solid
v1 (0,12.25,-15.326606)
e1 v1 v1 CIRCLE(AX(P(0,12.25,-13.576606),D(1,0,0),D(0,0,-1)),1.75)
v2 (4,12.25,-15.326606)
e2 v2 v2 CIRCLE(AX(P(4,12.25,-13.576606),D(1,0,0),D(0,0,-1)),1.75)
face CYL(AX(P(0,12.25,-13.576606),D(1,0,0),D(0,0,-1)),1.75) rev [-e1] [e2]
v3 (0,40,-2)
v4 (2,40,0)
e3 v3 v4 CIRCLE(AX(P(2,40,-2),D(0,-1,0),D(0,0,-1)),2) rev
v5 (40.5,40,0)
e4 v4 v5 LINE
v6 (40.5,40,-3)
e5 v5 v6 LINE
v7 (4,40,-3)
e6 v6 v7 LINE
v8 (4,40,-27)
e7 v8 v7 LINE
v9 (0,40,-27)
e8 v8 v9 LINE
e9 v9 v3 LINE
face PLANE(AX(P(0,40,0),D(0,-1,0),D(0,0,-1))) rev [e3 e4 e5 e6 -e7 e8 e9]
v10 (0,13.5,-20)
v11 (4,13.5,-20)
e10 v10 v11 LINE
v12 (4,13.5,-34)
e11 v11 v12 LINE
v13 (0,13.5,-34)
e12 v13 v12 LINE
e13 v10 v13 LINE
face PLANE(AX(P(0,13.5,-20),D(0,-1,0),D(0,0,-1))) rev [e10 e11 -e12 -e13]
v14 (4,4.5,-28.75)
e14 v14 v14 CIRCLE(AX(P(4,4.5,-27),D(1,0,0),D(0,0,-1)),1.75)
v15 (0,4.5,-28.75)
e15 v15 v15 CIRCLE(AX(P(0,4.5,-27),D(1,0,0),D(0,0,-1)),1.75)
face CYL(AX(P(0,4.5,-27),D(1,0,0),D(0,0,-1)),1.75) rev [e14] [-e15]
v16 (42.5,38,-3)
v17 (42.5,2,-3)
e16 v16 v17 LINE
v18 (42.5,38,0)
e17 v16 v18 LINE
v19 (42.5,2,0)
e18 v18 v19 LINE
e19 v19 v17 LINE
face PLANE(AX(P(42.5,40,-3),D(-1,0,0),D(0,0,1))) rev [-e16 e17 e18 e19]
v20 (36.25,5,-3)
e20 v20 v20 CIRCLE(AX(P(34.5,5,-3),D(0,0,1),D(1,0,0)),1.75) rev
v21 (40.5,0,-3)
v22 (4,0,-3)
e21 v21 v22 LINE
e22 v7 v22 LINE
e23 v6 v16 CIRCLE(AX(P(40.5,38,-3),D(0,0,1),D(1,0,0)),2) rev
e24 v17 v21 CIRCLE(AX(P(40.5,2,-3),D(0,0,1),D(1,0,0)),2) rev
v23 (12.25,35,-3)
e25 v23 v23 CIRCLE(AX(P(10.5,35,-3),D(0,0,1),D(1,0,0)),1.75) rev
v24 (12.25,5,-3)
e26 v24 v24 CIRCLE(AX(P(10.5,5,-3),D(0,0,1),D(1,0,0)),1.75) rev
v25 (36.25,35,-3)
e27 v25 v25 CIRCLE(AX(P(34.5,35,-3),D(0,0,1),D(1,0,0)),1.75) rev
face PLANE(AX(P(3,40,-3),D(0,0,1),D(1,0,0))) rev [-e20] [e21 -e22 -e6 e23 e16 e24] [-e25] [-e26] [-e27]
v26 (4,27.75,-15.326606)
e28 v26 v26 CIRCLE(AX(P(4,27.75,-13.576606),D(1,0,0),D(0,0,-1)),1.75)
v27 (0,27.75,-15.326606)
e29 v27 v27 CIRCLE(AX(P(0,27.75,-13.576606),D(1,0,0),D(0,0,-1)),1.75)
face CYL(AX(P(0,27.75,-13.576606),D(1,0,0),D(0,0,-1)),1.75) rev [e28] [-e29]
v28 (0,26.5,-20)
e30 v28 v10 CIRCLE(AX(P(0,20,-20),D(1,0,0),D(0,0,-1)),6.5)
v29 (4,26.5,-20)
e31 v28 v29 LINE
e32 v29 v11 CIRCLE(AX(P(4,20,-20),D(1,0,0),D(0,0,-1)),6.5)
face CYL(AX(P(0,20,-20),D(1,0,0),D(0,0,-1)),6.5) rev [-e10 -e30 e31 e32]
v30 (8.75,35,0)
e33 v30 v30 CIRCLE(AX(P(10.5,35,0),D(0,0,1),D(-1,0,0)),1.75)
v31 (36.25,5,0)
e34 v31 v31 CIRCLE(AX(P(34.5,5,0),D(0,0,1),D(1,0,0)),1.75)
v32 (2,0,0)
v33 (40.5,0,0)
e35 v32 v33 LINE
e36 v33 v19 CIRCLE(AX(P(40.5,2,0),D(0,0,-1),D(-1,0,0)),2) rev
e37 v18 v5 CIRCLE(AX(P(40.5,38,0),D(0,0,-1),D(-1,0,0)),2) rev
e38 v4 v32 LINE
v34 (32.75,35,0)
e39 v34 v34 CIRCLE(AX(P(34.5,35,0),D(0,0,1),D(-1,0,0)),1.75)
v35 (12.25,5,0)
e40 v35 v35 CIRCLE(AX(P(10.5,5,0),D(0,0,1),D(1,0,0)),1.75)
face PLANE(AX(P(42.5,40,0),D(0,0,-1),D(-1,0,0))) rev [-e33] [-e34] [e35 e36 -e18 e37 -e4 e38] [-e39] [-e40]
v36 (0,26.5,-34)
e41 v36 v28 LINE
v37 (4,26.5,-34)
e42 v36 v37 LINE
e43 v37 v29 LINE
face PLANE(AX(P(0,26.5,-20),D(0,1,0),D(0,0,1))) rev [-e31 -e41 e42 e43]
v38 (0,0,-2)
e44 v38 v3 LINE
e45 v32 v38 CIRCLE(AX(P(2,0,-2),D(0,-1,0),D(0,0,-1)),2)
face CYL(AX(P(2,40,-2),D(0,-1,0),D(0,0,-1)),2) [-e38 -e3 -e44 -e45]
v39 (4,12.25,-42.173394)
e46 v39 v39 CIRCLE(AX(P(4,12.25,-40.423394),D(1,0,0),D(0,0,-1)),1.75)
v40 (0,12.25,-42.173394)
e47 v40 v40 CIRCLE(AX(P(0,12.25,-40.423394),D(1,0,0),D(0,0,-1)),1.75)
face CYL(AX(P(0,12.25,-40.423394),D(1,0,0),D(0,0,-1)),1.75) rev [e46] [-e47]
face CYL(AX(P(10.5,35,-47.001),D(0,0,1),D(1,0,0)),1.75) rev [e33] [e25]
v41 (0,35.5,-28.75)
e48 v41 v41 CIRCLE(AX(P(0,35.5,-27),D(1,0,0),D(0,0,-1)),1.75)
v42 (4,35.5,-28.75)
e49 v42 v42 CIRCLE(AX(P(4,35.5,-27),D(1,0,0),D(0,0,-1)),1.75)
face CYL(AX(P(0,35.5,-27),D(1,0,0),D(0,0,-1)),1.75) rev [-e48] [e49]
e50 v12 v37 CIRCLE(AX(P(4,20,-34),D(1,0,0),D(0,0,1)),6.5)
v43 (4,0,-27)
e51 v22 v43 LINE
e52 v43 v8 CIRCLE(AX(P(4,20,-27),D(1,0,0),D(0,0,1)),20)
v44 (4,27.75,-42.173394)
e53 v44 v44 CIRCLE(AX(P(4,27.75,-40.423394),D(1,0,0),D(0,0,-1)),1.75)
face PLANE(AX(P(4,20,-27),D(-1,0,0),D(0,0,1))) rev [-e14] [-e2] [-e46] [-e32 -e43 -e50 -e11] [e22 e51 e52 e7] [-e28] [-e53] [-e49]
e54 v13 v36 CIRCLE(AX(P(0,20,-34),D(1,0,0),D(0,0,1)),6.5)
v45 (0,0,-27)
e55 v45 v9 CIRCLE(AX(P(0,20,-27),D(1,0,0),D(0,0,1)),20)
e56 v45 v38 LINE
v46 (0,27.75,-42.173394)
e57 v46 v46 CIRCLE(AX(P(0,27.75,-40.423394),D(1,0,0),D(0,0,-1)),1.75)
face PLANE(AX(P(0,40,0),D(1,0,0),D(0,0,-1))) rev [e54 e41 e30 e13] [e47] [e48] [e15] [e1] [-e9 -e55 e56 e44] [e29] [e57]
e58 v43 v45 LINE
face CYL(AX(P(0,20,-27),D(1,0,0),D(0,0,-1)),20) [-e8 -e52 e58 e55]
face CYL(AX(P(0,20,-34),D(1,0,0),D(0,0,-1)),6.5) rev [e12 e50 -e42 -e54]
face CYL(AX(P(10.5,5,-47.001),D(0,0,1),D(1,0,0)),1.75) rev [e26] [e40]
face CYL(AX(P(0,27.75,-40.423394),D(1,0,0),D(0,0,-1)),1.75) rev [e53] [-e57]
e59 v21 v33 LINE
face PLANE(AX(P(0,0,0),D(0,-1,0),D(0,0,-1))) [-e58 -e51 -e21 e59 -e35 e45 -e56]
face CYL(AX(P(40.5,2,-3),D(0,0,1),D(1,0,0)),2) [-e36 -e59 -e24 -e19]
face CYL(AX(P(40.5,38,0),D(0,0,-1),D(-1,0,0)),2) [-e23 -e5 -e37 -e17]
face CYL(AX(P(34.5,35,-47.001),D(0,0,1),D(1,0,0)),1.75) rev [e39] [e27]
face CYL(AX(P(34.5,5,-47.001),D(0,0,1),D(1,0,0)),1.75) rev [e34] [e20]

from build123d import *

# Parameters (mm, degrees)
BOSS_EXTRUDE1_DEPTH      = 40
BOSS_EXTRUDE2_DEPTH      = 1
BOSS_EXTRUDE2_DEPTH_BACK = 3
CUT_EXTRUDE1_DEPTH       = 73.740978822
SKETCH5_R                = 1.75
CUT_EXTRUDE2_DEPTH       = 73.740978822
FILLET1_R                = 2
CUT_EXTRUDE3_REACH       = 76.935
SKETCH6_R                = 1.75


# Read off the part's stored shape, not the designer's step: moBlkMgr[Ga_GB37]
with BuildPart() as part:
    # Sketch1 → Boss-Extrude1 (new body)
    with BuildSketch(Plane(origin=(0, 0, 0), x_dir=(1, 0, 0), z_dir=(0, 1, 0))):
        Polygon((0, 0), (0, 27), (3, 27), (3, 3), (42.5, 3), (42.5, 0), align=None)
    extrude(amount=BOSS_EXTRUDE1_DEPTH)

    # Sketch2 → Boss-Extrude2 (add, two sides: drawn at the far end of the back side and taken through both)
    with BuildSketch(Plane(origin=(3, 0, 0), x_dir=(0, 0, -1), z_dir=(1, 0, 0)).offset(-BOSS_EXTRUDE2_DEPTH_BACK)):
        with BuildLine():
            Line((3, 0), (27, 0))
            ThreePointArc((27, 0), (47, 20), (27, 40))
            Line((27, 40), (3, 40))
            Line((3, 40), (3, 0))
        make_face()
    extrude(amount=BOSS_EXTRUDE2_DEPTH + BOSS_EXTRUDE2_DEPTH_BACK)

    # Sketch3 → Cut-Extrude1 (cut, through all)
    with BuildSketch(Plane(origin=(4, 0, 0), x_dir=(0, 0, -1), z_dir=(1, 0, 0))):
        with BuildLine():
            Line((20, 26.5), (34, 26.5))
            ThreePointArc((34, 26.5), (40.5, 20), (34, 13.5))
            Line((34, 13.5), (20, 13.5))
            ThreePointArc((20, 13.5), (13.5, 20), (20, 26.5))
        make_face()
    extrude(amount=-CUT_EXTRUDE1_DEPTH, mode=Mode.SUBTRACT)

    # Sketch5 → Cut-Extrude2 (cut, through all)
    with BuildSketch(Plane(origin=(4, 0, 0), x_dir=(0, 0, -1), z_dir=(1, 0, 0))):
        with Locations((27, 4.5)):
            Circle(SKETCH5_R)
        with Locations((13.576606241, 12.25)):
            Circle(SKETCH5_R)
        with Locations((13.576606241, 27.75)):
            Circle(SKETCH5_R)
        with Locations((27, 35.5)):
            Circle(SKETCH5_R)
        with Locations((40.423393759, 27.75)):
            Circle(SKETCH5_R)
        with Locations((40.423393759, 12.25)):
            Circle(SKETCH5_R)
    extrude(amount=-CUT_EXTRUDE2_DEPTH, mode=Mode.SUBTRACT)

    # Fillet1
    fillet1_edges = [part.edges().sort_by_distance(p)[0] for p in [
        (0, 20, 0),
        (42.5, 0, -1.5),
        (42.5, 40, -1.5),
    ]]
    fillet(fillet1_edges, radius=FILLET1_R)

    # Sketch6 → Cut-Extrude3 (cut, up to next)
    with BuildSketch(Plane.XY, mode=Mode.PRIVATE) as cut_extrude3_sk1:
        with Locations((34.5, 5)):
            Circle(SKETCH6_R)
    cut_extrude3_tool1 = extrude(cut_extrude3_sk1.sketch, amount=-CUT_EXTRUDE3_REACH, mode=Mode.PRIVATE) & part.part
    # Sketch6 → Cut-Extrude3 (cut, up to next)
    with BuildSketch(Plane.XY, mode=Mode.PRIVATE) as cut_extrude3_sk2:
        with Locations((34.5, 35)):
            Circle(SKETCH6_R)
    cut_extrude3_tool2 = extrude(cut_extrude3_sk2.sketch, amount=-CUT_EXTRUDE3_REACH, mode=Mode.PRIVATE) & part.part
    # Sketch6 → Cut-Extrude3 (cut, up to next)
    with BuildSketch(Plane.XY, mode=Mode.PRIVATE) as cut_extrude3_sk3:
        with Locations((10.5, 35)):
            Circle(SKETCH6_R)
    cut_extrude3_tool3 = extrude(cut_extrude3_sk3.sketch, amount=-CUT_EXTRUDE3_REACH, mode=Mode.PRIVATE) & part.part
    # Sketch6 → Cut-Extrude3 (cut, up to next)
    with BuildSketch(Plane.XY, mode=Mode.PRIVATE) as cut_extrude3_sk4:
        with Locations((10.5, 5)):
            Circle(SKETCH6_R)
    cut_extrude3_tool4 = extrude(cut_extrude3_sk4.sketch, amount=-CUT_EXTRUDE3_REACH, mode=Mode.PRIVATE) & part.part
    add(cut_extrude3_tool1.solids().sort_by_distance((34.5, 5, 0))[0], mode=Mode.SUBTRACT)
    add(cut_extrude3_tool2.solids().sort_by_distance((34.5, 35, 0))[0], mode=Mode.SUBTRACT)
    add(cut_extrude3_tool3.solids().sort_by_distance((10.5, 35, 0))[0], mode=Mode.SUBTRACT)
    add(cut_extrude3_tool4.solids().sort_by_distance((10.5, 5, 0))[0], mode=Mode.SUBTRACT)


solid = part.part
